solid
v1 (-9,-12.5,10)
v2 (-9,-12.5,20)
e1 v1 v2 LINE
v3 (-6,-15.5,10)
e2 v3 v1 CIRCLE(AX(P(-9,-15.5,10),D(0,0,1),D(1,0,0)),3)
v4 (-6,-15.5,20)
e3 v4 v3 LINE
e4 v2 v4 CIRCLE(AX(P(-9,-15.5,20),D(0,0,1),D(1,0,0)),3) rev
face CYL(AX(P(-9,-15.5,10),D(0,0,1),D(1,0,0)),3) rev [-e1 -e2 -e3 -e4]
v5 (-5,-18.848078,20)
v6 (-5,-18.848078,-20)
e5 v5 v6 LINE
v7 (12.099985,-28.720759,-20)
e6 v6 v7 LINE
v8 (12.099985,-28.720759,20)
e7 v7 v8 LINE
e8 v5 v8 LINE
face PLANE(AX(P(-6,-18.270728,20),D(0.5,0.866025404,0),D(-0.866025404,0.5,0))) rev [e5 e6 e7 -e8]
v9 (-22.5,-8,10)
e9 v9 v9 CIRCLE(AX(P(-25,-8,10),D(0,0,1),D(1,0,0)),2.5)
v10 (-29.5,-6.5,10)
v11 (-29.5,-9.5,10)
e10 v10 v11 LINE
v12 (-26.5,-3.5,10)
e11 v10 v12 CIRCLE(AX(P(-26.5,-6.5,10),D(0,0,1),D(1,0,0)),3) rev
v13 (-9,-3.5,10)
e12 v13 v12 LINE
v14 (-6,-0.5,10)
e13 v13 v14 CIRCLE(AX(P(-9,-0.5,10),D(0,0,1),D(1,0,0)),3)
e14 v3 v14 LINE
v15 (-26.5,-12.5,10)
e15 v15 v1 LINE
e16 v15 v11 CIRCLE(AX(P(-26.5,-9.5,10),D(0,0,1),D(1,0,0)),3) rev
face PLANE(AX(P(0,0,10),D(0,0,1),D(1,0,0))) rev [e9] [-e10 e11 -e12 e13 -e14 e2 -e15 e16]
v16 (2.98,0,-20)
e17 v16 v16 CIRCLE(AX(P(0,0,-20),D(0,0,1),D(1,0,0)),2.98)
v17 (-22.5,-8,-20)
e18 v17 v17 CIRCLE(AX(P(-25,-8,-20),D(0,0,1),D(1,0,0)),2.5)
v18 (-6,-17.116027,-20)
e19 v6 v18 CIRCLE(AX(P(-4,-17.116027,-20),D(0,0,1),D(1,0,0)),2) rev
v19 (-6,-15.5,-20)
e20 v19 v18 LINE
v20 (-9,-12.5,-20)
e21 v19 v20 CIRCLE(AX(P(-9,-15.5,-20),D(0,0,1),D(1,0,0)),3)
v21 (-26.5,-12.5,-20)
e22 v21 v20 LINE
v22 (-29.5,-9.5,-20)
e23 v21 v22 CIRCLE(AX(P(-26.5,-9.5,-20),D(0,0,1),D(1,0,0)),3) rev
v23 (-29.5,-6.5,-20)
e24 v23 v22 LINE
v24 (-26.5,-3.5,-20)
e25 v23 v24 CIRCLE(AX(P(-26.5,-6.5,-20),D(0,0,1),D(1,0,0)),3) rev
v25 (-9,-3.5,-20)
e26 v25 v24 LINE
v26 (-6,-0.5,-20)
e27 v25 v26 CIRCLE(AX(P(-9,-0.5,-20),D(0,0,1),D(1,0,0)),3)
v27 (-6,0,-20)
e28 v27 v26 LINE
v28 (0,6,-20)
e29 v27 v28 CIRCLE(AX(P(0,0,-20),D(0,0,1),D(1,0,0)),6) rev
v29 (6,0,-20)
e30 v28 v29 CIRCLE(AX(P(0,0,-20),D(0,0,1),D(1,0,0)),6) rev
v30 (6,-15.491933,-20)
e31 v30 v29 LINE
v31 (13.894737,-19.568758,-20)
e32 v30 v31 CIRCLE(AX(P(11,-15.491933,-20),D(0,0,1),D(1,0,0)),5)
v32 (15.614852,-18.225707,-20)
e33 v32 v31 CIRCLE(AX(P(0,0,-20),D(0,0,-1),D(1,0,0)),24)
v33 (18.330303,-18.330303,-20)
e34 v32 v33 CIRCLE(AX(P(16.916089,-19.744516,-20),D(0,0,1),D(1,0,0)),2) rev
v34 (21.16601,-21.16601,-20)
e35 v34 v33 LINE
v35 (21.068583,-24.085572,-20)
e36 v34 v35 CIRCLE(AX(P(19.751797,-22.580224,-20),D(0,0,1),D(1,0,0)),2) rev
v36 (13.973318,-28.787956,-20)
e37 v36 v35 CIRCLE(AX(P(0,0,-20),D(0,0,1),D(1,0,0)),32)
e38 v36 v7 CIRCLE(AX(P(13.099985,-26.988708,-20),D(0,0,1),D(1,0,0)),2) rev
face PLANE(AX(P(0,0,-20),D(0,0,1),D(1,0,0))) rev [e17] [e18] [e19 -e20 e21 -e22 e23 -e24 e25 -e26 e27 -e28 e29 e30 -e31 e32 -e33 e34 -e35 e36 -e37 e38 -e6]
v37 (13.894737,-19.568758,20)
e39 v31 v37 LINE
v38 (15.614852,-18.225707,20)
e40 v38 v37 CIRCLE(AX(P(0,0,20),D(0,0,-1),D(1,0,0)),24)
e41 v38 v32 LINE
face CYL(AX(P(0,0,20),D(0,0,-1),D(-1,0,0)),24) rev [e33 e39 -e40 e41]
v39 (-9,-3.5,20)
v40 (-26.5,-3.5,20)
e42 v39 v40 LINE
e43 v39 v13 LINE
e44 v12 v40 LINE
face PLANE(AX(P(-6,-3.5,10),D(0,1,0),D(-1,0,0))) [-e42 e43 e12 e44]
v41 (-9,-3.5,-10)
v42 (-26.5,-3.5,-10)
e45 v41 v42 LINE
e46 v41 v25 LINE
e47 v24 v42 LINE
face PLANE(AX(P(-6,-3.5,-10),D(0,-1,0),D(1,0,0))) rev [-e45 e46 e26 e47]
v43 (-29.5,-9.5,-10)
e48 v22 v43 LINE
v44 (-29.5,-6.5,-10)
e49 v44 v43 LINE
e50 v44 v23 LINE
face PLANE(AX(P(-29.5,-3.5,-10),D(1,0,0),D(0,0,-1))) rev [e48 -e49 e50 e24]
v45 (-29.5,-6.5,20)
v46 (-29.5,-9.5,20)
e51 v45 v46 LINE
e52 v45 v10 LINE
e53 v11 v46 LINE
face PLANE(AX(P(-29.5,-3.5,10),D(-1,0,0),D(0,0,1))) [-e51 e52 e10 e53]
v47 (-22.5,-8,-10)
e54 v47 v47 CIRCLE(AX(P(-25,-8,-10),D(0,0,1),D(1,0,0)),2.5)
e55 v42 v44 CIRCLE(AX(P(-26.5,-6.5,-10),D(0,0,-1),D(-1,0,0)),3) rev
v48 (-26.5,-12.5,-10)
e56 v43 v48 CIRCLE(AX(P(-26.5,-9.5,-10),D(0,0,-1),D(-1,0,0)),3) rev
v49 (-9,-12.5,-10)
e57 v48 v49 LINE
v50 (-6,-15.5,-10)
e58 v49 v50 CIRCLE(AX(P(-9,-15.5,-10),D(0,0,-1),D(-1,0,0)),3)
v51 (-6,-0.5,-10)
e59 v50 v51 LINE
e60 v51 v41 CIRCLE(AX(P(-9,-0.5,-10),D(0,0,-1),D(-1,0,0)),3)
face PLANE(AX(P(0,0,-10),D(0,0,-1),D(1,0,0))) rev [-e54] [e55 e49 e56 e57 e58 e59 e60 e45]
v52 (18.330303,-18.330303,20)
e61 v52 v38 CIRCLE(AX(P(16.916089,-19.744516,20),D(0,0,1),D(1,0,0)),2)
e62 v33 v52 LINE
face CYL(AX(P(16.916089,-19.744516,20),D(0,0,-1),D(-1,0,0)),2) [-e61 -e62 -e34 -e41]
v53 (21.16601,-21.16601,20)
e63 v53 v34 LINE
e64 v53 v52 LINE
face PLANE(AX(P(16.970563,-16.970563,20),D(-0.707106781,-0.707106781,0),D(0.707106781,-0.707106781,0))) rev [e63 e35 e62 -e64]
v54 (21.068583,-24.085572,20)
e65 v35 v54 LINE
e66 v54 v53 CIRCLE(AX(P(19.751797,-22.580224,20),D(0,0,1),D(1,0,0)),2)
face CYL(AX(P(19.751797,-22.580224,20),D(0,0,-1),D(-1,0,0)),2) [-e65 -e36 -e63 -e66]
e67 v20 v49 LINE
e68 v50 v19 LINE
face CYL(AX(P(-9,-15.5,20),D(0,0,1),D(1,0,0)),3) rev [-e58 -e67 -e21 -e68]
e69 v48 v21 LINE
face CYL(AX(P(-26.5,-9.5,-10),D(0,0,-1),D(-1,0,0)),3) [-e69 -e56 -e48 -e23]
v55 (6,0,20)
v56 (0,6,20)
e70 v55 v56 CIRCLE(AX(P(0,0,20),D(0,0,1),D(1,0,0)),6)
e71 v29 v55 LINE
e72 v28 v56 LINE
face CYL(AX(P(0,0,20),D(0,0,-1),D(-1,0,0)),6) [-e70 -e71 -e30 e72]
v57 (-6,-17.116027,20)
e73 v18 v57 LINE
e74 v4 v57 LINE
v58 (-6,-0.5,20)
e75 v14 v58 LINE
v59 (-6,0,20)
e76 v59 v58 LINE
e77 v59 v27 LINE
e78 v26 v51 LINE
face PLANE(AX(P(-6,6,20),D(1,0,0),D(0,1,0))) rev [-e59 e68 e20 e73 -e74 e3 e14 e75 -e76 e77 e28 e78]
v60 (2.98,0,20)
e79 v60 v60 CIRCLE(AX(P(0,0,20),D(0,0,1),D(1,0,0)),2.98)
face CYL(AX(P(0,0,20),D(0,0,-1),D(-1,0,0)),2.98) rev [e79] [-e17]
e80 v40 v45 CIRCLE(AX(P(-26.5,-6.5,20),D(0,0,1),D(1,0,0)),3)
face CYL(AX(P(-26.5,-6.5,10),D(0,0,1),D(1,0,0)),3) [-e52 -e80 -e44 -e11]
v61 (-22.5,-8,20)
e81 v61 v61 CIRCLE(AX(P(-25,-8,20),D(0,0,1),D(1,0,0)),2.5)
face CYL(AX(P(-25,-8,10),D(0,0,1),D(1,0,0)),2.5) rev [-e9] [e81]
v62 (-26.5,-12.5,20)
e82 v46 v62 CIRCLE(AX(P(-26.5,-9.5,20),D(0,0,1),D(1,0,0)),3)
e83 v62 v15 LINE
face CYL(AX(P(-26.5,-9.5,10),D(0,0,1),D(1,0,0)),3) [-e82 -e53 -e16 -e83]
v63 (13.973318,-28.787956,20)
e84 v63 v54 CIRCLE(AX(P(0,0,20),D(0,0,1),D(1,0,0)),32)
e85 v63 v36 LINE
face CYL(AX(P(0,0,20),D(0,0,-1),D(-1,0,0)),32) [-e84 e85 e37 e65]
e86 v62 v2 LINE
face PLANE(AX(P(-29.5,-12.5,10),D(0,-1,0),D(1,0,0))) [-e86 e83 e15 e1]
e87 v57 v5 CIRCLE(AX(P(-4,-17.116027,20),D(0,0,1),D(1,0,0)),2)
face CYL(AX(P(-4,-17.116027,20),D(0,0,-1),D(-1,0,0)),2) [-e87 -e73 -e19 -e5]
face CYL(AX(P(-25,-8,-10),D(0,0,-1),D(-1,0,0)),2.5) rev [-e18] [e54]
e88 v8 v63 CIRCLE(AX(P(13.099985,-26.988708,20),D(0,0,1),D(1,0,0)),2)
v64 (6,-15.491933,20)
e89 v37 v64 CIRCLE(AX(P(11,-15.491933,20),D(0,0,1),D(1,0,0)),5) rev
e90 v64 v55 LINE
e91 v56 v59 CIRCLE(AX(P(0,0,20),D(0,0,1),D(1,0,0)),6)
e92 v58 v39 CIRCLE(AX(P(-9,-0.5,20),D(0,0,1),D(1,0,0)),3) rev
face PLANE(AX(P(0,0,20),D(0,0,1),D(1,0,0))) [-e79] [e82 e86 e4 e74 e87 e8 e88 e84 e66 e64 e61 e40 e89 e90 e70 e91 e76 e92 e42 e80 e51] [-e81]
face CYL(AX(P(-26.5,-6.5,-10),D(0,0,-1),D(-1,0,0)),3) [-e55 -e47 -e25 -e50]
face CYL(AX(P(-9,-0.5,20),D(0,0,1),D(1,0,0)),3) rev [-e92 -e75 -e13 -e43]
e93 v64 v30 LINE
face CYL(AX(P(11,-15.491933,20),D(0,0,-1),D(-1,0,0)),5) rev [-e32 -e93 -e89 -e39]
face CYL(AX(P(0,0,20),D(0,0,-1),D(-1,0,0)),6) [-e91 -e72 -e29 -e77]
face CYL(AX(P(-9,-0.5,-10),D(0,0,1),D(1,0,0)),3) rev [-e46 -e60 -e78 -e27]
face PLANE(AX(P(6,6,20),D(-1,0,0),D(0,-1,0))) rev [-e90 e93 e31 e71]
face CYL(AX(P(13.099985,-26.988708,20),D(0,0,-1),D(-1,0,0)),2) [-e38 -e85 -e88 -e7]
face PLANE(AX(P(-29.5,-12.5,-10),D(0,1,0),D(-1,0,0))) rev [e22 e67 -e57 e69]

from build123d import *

# Parameters (mm, degrees)
SKETCH2_R            = 2.98
BOSS_EXTRUDE1_DEPTH  = 20
FILLET1_R            = 6
FILLET2_R            = 2
FILLET4_R            = 5
SKETCH3_W            = 23.5
SKETCH3_H            = 9
SKETCH3_R            = 2.5
BOSS_EXTRUDE2_DEPTH  = 10
FILLET3_R            = 3
FILLET3_OF_MIRROR1_R = 3


with BuildPart() as part:
    # Sketch2 → Boss-Extrude1 (new, symmetric)
    with BuildSketch(Plane.XY):
        with BuildLine():
            Line((-6, 6), (6, 6))
            Line((6, 6), (6, -23.237900077))
            ThreePointArc((6, -23.237900077), (11.905106784, -20.839108245), (16.970562748, -16.970562748))
            Line((16.970562748, -16.970562748), (22.627416998, -22.627416998))
            ThreePointArc((22.627416998, -22.627416998), (18.117975616, -26.376864096), (13, -29.240383034))
            Line((13, -29.240383034), (-6, -18.27072792))
            Line((-6, -18.27072792), (-6, 6))
        make_face()
        Circle(SKETCH2_R, mode=Mode.SUBTRACT)
    extrude(amount=BOSS_EXTRUDE1_DEPTH, both=True)

    # Fillet1
    fillet1_edges = [part.edges().sort_by_distance(p)[0] for p in [
        (6, 6, 0),
        (-6, 6, 0),
    ]]
    fillet(fillet1_edges, radius=FILLET1_R - 0.0001)  # a hair under: the kernel refuses the full size

    # Fillet2
    fillet2_edges = [part.edges().sort_by_distance(p)[0] for p in [
        (16.970562748, -16.970562748, 0),
        (22.627416998, -22.627416998, 0),
        (13, -29.240383034, 0),
        (-6, -18.27072792, 0),
    ]]
    fillet(fillet2_edges, radius=FILLET2_R)

    # Fillet4
    fillet4_edges = [part.edges().sort_by_distance(p)[0] for p in [
        (6, -23.237900077, 0),
    ]]
    fillet(fillet4_edges, radius=FILLET4_R)

    # Sketch3 → Boss-Extrude2 (add)
    with BuildSketch(Plane.XY.offset(20)):
        with Locations((-17.75, -8)):
            Rectangle(SKETCH3_W, SKETCH3_H)
        with Locations((-25, -8)):
            Circle(SKETCH3_R, mode=Mode.SUBTRACT)
    boss_extrude2 = extrude(amount=-BOSS_EXTRUDE2_DEPTH)

    # Fillet3
    fillet3_edges = [part.edges().sort_by_distance(p)[0] for p in [
        (-6, -3.5, 15),
        (-6, -12.5, 15),
        (-29.5, -12.5, 15),
        (-29.5, -3.5, 15),
    ]]
    fillet(fillet3_edges, radius=FILLET3_R)

    # Mirror1: Boss-Extrude2 across plane
    add(boss_extrude2.mirror(Plane.XY))

    # Fillet3 of Mirror1
    fillet3_of_mirror1_edges = [part.edges().sort_by_distance(p)[0] for p in [
        (-6, -3.5, -15),
        (-6, -12.5, -15),
        (-29.5, -12.5, -15),
        (-29.5, -3.5, -15),
    ]]
    fillet(fillet3_of_mirror1_edges, radius=FILLET3_OF_MIRROR1_R)


solid = part.part
